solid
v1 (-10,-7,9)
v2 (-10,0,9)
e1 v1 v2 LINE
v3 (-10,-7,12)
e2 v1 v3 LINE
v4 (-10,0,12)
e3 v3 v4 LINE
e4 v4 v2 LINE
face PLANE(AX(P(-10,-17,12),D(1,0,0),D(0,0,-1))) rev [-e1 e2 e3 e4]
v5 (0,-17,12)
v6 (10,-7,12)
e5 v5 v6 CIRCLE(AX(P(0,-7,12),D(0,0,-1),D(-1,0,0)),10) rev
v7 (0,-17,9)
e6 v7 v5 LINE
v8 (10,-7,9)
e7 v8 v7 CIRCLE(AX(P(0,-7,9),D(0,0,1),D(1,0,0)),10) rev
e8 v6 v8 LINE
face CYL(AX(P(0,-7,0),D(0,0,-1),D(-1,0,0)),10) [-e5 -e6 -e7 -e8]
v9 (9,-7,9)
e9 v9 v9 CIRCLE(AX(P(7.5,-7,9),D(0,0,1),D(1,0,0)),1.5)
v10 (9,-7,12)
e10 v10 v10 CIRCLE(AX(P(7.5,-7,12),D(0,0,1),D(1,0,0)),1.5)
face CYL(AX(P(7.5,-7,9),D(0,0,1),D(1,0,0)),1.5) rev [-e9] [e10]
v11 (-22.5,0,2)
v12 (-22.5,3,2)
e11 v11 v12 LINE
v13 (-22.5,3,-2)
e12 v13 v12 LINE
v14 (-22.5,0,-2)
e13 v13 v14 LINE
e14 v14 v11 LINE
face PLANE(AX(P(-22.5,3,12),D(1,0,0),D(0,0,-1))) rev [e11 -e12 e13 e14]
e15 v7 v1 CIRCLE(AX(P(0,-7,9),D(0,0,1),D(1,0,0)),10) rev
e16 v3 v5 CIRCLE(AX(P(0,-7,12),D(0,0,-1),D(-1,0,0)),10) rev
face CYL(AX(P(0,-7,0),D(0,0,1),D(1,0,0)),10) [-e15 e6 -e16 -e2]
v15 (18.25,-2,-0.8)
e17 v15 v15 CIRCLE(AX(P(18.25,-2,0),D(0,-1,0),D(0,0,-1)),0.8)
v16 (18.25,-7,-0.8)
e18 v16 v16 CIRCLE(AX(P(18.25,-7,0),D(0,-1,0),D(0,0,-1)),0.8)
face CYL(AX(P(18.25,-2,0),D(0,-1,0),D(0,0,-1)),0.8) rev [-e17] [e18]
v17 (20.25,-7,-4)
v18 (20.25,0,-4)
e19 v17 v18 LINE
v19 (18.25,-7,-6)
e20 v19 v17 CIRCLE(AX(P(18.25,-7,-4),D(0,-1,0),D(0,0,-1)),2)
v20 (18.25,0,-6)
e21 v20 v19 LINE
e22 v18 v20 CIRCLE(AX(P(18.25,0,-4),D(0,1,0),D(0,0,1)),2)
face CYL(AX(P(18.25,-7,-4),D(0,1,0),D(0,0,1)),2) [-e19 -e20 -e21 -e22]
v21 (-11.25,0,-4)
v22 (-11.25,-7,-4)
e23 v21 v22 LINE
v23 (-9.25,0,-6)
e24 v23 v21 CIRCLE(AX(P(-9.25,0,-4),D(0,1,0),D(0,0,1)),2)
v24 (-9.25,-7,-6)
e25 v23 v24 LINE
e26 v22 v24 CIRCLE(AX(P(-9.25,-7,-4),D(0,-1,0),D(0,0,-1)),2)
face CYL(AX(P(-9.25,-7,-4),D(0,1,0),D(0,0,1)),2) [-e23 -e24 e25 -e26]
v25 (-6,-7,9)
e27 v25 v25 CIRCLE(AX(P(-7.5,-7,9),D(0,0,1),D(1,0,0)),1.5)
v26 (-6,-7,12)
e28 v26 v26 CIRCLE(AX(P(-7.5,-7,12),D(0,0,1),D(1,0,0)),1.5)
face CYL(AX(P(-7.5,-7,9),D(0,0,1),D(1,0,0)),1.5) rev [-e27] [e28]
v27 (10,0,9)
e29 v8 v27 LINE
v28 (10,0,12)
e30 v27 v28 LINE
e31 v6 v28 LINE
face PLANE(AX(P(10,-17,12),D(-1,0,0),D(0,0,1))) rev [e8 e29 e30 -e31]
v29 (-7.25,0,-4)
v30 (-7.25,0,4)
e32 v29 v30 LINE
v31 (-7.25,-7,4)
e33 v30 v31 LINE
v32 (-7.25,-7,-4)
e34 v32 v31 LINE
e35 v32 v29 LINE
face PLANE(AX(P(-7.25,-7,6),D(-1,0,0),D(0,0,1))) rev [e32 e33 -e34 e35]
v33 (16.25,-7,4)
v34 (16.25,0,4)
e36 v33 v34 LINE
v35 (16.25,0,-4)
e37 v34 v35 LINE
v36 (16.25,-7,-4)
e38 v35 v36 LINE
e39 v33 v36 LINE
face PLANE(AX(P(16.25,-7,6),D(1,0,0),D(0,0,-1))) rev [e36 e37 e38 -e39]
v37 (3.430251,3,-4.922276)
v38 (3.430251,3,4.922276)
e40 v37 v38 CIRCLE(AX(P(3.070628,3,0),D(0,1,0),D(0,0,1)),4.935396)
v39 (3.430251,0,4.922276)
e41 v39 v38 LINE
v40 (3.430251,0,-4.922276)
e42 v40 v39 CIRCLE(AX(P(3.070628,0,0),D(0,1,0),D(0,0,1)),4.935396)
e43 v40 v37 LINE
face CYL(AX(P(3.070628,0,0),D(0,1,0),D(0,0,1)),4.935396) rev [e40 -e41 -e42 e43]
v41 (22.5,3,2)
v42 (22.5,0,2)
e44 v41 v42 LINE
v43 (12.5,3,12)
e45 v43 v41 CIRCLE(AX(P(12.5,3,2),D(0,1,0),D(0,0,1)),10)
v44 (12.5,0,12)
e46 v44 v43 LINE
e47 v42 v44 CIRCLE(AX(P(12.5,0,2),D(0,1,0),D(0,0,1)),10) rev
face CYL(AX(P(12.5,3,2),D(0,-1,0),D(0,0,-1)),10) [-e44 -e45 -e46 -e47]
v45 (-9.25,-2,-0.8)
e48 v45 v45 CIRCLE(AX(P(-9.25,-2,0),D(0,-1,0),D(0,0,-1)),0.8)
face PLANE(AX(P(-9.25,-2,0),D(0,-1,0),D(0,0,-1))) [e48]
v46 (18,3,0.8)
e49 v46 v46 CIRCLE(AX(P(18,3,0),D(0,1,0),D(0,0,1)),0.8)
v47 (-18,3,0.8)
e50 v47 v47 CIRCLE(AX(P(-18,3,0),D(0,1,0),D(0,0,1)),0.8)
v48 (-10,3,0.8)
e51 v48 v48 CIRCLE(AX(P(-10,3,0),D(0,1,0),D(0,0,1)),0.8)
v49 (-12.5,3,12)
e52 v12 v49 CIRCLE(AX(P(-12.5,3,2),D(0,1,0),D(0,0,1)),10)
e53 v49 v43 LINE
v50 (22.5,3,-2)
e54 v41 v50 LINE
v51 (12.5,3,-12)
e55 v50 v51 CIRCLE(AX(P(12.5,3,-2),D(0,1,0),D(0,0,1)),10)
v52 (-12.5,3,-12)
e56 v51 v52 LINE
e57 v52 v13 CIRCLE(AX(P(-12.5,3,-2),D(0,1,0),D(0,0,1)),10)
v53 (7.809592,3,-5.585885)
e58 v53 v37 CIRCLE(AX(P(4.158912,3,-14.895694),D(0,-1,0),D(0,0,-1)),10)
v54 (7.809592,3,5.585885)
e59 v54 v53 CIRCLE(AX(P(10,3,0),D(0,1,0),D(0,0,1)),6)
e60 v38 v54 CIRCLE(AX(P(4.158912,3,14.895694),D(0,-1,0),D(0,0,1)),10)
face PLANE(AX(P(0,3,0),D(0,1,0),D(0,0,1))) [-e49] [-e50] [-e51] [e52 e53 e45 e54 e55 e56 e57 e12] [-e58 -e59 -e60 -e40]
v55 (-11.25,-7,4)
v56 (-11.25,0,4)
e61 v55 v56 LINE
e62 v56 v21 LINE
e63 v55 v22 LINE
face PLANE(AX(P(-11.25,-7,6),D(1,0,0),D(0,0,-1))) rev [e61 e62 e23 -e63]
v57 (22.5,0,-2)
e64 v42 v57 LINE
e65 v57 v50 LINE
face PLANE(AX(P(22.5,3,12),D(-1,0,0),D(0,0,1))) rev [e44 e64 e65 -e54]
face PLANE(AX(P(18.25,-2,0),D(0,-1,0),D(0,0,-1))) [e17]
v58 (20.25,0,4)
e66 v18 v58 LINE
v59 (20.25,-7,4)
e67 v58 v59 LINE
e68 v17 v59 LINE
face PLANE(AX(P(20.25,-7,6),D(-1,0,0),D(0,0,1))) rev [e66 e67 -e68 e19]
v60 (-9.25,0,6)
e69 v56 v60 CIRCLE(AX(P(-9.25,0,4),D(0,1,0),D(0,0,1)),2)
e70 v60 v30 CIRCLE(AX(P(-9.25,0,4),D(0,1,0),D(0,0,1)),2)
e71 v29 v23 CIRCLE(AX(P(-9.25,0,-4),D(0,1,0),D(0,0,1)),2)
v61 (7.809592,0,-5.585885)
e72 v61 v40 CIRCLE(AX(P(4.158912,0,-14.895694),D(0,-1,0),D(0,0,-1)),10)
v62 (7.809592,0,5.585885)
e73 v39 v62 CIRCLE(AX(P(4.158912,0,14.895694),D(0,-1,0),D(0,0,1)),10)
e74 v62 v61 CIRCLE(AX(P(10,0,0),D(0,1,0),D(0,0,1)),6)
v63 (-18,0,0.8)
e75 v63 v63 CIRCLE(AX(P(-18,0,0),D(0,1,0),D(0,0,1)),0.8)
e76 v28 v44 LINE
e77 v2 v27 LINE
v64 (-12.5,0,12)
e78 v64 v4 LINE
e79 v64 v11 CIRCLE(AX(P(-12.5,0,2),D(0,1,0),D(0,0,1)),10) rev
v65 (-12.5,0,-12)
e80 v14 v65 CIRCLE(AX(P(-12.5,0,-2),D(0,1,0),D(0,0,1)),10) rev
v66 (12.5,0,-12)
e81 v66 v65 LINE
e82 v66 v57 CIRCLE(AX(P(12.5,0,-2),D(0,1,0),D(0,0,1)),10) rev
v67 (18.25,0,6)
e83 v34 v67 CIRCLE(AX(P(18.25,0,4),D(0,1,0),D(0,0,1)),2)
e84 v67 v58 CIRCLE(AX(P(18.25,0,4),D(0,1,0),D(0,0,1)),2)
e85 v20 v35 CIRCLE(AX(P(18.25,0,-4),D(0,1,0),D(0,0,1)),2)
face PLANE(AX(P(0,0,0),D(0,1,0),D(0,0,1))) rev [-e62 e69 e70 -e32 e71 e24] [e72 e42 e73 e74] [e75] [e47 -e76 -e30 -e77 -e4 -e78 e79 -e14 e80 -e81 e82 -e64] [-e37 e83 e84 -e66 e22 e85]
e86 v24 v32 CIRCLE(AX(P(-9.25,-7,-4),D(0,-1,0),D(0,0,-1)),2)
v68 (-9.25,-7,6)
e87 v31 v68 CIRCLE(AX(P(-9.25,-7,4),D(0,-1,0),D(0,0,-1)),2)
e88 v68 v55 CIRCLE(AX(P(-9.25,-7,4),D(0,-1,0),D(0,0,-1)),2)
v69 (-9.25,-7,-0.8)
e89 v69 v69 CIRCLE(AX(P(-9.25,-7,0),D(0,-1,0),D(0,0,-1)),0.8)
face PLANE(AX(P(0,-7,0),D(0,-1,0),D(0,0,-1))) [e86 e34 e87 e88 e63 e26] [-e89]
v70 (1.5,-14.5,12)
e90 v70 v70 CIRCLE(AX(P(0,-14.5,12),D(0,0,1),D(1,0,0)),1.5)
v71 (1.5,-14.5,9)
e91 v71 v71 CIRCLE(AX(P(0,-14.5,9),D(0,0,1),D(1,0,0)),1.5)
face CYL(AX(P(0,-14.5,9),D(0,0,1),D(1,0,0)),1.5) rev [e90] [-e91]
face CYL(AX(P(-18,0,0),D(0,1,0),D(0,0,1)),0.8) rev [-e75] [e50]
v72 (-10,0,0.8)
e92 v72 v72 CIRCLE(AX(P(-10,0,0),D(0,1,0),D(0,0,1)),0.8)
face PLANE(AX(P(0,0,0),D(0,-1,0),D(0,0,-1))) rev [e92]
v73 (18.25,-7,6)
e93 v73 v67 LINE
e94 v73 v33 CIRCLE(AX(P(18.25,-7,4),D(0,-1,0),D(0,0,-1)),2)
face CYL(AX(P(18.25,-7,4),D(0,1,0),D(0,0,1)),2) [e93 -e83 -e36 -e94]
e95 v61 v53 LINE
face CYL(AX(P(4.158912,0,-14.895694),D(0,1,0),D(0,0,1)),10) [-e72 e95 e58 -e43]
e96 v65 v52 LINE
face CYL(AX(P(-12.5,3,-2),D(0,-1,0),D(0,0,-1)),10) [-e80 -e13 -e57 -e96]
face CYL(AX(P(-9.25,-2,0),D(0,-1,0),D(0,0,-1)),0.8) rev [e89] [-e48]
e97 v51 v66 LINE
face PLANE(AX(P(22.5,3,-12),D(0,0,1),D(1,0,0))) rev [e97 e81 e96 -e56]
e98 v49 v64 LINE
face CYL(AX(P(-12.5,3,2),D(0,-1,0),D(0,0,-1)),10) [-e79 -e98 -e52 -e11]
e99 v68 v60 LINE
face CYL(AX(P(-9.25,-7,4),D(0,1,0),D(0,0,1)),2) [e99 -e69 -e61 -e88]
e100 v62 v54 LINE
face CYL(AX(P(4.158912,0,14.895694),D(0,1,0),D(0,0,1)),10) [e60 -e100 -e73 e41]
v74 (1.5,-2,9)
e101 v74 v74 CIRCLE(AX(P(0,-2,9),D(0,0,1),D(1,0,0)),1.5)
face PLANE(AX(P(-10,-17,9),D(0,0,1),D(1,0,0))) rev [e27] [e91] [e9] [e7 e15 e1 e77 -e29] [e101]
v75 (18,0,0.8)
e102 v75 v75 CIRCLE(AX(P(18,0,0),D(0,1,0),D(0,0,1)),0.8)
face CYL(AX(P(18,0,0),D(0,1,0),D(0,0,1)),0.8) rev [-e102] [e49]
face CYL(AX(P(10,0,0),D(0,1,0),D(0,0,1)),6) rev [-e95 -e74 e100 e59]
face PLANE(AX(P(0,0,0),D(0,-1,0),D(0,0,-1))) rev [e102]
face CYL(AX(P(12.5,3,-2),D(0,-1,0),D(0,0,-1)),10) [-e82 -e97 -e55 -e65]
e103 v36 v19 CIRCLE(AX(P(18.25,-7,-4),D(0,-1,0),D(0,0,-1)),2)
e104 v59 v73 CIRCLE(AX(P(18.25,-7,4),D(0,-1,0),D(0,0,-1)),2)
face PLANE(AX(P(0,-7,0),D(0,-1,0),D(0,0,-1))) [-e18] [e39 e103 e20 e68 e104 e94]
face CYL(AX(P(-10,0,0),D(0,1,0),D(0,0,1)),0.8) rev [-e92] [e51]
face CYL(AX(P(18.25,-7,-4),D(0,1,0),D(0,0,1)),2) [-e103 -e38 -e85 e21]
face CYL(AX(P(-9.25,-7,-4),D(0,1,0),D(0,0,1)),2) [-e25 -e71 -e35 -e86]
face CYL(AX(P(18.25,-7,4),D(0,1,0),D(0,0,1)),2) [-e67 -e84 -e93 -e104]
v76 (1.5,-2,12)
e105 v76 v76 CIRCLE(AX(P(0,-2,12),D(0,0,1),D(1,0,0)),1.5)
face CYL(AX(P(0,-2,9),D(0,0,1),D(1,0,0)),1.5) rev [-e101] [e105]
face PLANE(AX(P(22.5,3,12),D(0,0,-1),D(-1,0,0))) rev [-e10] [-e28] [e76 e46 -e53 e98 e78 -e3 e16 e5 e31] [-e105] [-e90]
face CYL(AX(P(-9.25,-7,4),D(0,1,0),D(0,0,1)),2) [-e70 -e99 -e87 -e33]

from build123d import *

# Parameters (mm, degrees)
SKETCH1_W           = 45
SKETCH1_H           = 24
BOSS_EXTRUDE1_DEPTH = 3
SKETCH2_R           = 0.8
CUT_EXTRUDE1_DEPTH  = 26.675864153
SKETCH3_W           = 4
SKETCH3_H           = 12
BOSS_EXTRUDE2_DEPTH = 7
SKETCH4_R           = 0.8
CUT_EXTRUDE2_DEPTH  = 5
FILLET1_R           = 2
FILLET2_R           = 10
SKETCH6_W           = 20
SKETCH6_H           = 3
BOSS_EXTRUDE3_DEPTH = 17
FILLET3_R           = 10
SKETCH7_R           = 1.5
CUT_EXTRUDE3_DEPTH  = 3


with BuildPart() as part:
    # Sketch1 → Boss-Extrude1 (new body)
    with BuildSketch(Plane(origin=(0, 0, 0), x_dir=(1, 0, 0), z_dir=(0, 1, 0))):
        Rectangle(SKETCH1_W, SKETCH1_H)
    extrude(amount=BOSS_EXTRUDE1_DEPTH)

    # Sketch2 → Cut-Extrude1 (cut, through all)
    with BuildSketch(Plane(origin=(0, 3, 0), x_dir=(1, 0, 0), z_dir=(0, 1, 0))):
        with Locations(Location((18, 0, 0), (0, 0, 270))):
            Circle(SKETCH2_R)
        with Locations(Location((-10, 0, 0), (0, 0, 270))):
            Circle(SKETCH2_R)
        with Locations(Location((-18, 0, 0), (0, 0, 270))):
            Circle(SKETCH2_R)
        with BuildLine():
            ThreePointArc((7.809591844, -5.585885079), (16, 0), (7.809591844, 5.585885079))
            ThreePointArc((7.809591844, 5.585885079), (5.65712524, 5.008562723), (3.430251149, 4.922276176))
            ThreePointArc((3.430251149, 4.922276176), (-1.864767372, 0), (3.430251149, -4.922276176))
            ThreePointArc((3.430251149, -4.922276176), (5.65712524, -5.008562723), (7.809591844, -5.585885079))
        make_face()
    extrude(amount=-CUT_EXTRUDE1_DEPTH, mode=Mode.SUBTRACT)

    # Sketch3 → Boss-Extrude2 (add)
    with BuildSketch(Plane.XZ):
        with Locations((-9.25, 0)):
            Rectangle(SKETCH3_W, SKETCH3_H)
        with Locations((18.25, 0)):
            Rectangle(SKETCH3_W, SKETCH3_H)
    extrude(amount=BOSS_EXTRUDE2_DEPTH)

    # Sketch4 → Cut-Extrude2 (cut)
    with BuildSketch(Plane.XZ.offset(7)):
        with Locations(Location((18.25, 0, 0), (0, 0, 270))):
            Circle(SKETCH4_R)
        with Locations(Location((-9.25, 0, 0), (0, 0, 270))):
            Circle(SKETCH4_R)
    extrude(amount=-CUT_EXTRUDE2_DEPTH, mode=Mode.SUBTRACT)

    # Fillet1
    fillet1_edges = [part.edges().sort_by_distance(p)[0] for p in [
        (16.25, -3.5, -6),
        (-11.25, -3.5, -6),
        (-7.25, -3.5, -6),
        (20.25, -3.5, -6),
        (-11.25, -3.5, 6),
        (-7.25, -3.5, 6),
        (16.25, -3.5, 6),
        (20.25, -3.5, 6),
    ]]
    fillet(fillet1_edges, radius=FILLET1_R - 0.0001)  # a hair under: the kernel refuses the full size

    # Fillet2
    fillet2_edges = [part.edges().sort_by_distance(p)[0] for p in [
        (-22.5, 1.5, -12),
        (22.5, 1.5, -12),
        (22.5, 1.5, 12),
        (-22.5, 1.5, 12),
    ]]
    fillet(fillet2_edges, radius=FILLET2_R)

    # Sketch6 → Boss-Extrude3 (add)
    with BuildSketch(Plane.XZ):
        with Locations((0, 10.5)):
            Rectangle(SKETCH6_W, SKETCH6_H)
    extrude(amount=BOSS_EXTRUDE3_DEPTH)

    # Fillet3
    fillet3_edges = [part.edges().sort_by_distance(p)[0] for p in [
        (-10, -17, 10.5),
        (10, -17, 10.5),
    ]]
    fillet(fillet3_edges, radius=FILLET3_R - 0.0001)  # a hair under: the kernel refuses the full size

    # Sketch7 → Cut-Extrude3 (cut)
    with BuildSketch(Plane.XY.offset(12)):
        with Locations((0, -14.5)):
            Circle(SKETCH7_R)
        with Locations((0, -2)):
            Circle(SKETCH7_R)
        with Locations((7.5, -7)):
            Circle(SKETCH7_R)
        with Locations((-7.5, -7)):
            Circle(SKETCH7_R)
    extrude(amount=-CUT_EXTRUDE3_DEPTH, mode=Mode.SUBTRACT)


solid = part.part
